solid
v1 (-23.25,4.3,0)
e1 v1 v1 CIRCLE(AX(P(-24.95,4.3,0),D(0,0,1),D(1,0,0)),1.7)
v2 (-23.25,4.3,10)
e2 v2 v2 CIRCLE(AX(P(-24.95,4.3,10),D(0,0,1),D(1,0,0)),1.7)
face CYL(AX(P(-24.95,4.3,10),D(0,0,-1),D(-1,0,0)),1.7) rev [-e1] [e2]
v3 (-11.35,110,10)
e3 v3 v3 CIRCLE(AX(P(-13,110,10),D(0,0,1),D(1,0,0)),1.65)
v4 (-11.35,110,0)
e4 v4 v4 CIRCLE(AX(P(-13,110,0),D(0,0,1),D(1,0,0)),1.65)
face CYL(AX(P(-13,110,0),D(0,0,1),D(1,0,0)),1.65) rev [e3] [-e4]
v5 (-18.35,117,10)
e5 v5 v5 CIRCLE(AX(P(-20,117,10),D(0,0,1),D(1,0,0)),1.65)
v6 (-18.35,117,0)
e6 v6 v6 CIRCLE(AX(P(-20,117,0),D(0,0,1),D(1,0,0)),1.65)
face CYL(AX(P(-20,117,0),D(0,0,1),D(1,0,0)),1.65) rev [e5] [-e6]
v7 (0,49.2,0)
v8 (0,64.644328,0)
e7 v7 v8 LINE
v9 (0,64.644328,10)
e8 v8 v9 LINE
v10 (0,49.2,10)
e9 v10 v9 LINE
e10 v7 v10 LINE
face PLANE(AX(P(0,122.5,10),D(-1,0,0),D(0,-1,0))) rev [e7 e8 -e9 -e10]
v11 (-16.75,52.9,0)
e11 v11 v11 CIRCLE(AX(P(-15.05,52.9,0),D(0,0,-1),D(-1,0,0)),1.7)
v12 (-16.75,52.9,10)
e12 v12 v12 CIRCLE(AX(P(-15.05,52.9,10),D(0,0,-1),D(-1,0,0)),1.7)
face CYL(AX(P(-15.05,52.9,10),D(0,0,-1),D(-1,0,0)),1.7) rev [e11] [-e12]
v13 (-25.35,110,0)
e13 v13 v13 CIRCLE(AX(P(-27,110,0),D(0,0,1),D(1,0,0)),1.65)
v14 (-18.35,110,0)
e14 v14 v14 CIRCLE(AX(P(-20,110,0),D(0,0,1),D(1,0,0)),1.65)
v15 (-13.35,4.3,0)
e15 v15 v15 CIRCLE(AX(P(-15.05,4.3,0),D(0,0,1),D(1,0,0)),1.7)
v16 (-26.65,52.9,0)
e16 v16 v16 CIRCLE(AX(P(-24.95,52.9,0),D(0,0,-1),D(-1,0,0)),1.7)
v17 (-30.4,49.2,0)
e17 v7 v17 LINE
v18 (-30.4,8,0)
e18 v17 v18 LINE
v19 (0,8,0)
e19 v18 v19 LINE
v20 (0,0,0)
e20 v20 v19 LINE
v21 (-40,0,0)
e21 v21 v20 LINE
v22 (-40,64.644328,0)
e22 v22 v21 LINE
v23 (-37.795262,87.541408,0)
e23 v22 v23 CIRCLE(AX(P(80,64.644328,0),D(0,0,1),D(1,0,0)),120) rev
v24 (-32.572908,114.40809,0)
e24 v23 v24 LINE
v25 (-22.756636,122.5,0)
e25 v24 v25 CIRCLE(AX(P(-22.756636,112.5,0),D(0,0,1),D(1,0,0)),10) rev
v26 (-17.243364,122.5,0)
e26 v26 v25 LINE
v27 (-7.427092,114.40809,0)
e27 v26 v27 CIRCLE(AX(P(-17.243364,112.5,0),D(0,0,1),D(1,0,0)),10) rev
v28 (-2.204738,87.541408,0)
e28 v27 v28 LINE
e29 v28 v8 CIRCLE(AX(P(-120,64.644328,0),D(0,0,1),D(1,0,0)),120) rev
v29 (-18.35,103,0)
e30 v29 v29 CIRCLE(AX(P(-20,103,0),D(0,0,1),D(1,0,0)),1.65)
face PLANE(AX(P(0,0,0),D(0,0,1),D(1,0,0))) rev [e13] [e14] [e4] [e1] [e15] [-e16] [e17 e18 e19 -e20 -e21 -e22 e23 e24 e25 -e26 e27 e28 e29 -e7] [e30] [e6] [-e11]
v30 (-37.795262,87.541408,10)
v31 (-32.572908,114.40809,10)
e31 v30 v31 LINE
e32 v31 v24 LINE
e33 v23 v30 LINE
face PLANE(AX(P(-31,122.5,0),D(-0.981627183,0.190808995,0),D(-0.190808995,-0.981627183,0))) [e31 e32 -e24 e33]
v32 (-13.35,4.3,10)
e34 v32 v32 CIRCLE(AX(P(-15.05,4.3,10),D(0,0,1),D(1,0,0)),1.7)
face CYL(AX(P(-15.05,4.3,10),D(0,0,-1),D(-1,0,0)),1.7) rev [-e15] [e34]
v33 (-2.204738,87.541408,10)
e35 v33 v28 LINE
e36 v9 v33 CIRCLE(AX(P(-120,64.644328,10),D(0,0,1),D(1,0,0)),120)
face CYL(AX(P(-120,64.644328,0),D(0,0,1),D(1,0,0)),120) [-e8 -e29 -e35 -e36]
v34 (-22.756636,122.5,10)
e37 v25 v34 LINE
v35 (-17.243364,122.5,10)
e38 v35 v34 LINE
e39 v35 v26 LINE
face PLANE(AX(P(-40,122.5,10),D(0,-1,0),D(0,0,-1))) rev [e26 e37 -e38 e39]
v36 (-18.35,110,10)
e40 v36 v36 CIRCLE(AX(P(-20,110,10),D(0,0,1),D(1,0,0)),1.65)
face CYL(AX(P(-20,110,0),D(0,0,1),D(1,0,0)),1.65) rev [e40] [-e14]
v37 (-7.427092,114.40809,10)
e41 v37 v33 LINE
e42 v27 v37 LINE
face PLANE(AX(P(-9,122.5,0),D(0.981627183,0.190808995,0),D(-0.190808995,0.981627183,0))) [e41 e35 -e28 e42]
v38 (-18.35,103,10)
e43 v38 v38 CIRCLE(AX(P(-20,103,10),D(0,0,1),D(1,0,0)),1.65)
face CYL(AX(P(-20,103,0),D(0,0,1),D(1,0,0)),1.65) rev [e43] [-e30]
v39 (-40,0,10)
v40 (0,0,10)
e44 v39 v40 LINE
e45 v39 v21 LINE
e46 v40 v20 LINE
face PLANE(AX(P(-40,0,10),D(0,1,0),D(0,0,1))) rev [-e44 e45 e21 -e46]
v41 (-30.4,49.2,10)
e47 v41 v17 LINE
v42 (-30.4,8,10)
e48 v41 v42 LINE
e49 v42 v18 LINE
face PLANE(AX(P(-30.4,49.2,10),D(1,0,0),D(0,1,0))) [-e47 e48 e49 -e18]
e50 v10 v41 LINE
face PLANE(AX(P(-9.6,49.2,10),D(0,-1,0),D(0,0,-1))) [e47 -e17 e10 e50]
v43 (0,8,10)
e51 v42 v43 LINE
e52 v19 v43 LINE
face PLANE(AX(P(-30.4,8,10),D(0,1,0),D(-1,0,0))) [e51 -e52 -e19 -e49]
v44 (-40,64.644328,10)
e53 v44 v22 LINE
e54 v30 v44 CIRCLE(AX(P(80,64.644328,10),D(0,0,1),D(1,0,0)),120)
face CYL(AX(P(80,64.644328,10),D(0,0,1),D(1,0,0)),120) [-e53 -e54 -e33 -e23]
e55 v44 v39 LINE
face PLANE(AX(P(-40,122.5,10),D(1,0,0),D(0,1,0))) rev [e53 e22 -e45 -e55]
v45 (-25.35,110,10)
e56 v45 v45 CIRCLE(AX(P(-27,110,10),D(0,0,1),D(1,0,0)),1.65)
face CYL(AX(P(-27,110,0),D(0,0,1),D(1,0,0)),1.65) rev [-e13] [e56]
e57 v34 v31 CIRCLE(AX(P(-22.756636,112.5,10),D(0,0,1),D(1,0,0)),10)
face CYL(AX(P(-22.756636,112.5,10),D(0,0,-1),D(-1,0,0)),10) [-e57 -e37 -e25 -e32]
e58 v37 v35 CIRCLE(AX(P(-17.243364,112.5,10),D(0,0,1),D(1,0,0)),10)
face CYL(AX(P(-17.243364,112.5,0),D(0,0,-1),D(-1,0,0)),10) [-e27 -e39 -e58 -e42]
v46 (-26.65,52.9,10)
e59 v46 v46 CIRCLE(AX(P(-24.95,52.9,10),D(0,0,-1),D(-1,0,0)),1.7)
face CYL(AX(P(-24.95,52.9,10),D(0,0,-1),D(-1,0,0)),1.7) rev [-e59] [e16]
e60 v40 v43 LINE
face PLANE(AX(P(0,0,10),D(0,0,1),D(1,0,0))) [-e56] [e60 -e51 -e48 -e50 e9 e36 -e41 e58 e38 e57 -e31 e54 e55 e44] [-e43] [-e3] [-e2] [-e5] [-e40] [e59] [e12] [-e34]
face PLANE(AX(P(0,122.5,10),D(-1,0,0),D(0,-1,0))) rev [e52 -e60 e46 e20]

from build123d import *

# Parameters (mm, degrees)
SKETCH2_W           = 40
SKETCH2_H           = 122.5
BOSS_EXTRUDE1_DEPTH = 10
SKETCH3_R           = 1.7
SKETCH3_W           = 20.8
SKETCH3_H           = 41.2
CUT_EXTRUDE3_DEPTH  = 130.252659547
SKETCH4_R           = 1.65
CUT_EXTRUDE4_DEPTH  = 130.252659547
SKETCH5_W           = 30.4
SKETCH5_H           = 41.2
SKETCH5_W_2         = 9
SKETCH5_H_2         = 52.5
CUT_EXTRUDE5_DEPTH  = 130.252659547
DRAFT11_DEPTH       = 10
FILLET4_R           = 120
FILLET5_R           = 10


# Read off the part's stored shape, not the designer's step: Draft11
with BuildPart() as part:
    # Sketch2 → Boss-Extrude1 (new body)
    with BuildSketch(Plane.XY):
        with Locations((-20, 61.25)):
            Rectangle(SKETCH2_W, SKETCH2_H)
    extrude(amount=BOSS_EXTRUDE1_DEPTH)

    # Sketch3 → Cut-Extrude3 (cut, through all)
    with BuildSketch(Plane.XY):
        with Locations((-24.95, 4.3)):
            Circle(SKETCH3_R)
        with Locations((-15.05, 4.3)):
            Circle(SKETCH3_R)
        with Locations(Location((-15.05, 52.9, 0), (0, 0, 180))):
            Circle(SKETCH3_R)
        with Locations(Location((-24.95, 52.9, 0), (0, 0, 180))):
            Circle(SKETCH3_R)
        with Locations((-20, 28.6)):
            Rectangle(SKETCH3_W, SKETCH3_H)
    extrude(amount=CUT_EXTRUDE3_DEPTH, mode=Mode.SUBTRACT)

    # Sketch4 → Cut-Extrude4 (cut, through all)
    with BuildSketch(Plane.XY.offset(10)):
        with Locations((-20, 110)):
            Circle(SKETCH4_R)
        with Locations((-27, 110)):
            Circle(SKETCH4_R)
        with Locations((-20, 117)):
            Circle(SKETCH4_R)
        with Locations((-13, 110)):
            Circle(SKETCH4_R)
        with Locations((-20, 103)):
            Circle(SKETCH4_R)
    extrude(amount=-CUT_EXTRUDE4_DEPTH, mode=Mode.SUBTRACT)

    # Sketch5 → Cut-Extrude5 (cut, through all)
    with BuildSketch(Plane.XY.offset(10)):
        with Locations((-15.2, 28.6)):
            Rectangle(SKETCH5_W, SKETCH5_H)
        with Locations((-35.5, 96.25)):
            Rectangle(SKETCH5_W_2, SKETCH5_H_2)
        with Locations((-4.5, 96.25)):
            Rectangle(SKETCH5_W_2, SKETCH5_H_2)
    extrude(amount=-CUT_EXTRUDE5_DEPTH, mode=Mode.SUBTRACT)

    # Draft11 outline → Draft11 (add)
    with BuildSketch(Plane.XY):
        Polygon((0, 70), (0, 76.199013856), (-9, 122.5), (-9, 70), align=None)
        Polygon((-31, 70), (-31, 122.5), (-40, 76.199013856), (-40, 70), align=None)
    extrude(amount=DRAFT11_DEPTH)

    # Fillet4
    fillet4_edges = [part.edges().sort_by_distance(p)[0] for p in [
        (0, 76.199013856, 5),
        (-40, 76.199013856, 5),
    ]]
    fillet(fillet4_edges, radius=FILLET4_R)

    # Fillet5
    fillet5_edges = [part.edges().sort_by_distance(p)[0] for p in [
        (-9, 122.5, 5),
        (-31, 122.5, 5),
    ]]
    fillet(fillet5_edges, radius=FILLET5_R)


solid = part.part
